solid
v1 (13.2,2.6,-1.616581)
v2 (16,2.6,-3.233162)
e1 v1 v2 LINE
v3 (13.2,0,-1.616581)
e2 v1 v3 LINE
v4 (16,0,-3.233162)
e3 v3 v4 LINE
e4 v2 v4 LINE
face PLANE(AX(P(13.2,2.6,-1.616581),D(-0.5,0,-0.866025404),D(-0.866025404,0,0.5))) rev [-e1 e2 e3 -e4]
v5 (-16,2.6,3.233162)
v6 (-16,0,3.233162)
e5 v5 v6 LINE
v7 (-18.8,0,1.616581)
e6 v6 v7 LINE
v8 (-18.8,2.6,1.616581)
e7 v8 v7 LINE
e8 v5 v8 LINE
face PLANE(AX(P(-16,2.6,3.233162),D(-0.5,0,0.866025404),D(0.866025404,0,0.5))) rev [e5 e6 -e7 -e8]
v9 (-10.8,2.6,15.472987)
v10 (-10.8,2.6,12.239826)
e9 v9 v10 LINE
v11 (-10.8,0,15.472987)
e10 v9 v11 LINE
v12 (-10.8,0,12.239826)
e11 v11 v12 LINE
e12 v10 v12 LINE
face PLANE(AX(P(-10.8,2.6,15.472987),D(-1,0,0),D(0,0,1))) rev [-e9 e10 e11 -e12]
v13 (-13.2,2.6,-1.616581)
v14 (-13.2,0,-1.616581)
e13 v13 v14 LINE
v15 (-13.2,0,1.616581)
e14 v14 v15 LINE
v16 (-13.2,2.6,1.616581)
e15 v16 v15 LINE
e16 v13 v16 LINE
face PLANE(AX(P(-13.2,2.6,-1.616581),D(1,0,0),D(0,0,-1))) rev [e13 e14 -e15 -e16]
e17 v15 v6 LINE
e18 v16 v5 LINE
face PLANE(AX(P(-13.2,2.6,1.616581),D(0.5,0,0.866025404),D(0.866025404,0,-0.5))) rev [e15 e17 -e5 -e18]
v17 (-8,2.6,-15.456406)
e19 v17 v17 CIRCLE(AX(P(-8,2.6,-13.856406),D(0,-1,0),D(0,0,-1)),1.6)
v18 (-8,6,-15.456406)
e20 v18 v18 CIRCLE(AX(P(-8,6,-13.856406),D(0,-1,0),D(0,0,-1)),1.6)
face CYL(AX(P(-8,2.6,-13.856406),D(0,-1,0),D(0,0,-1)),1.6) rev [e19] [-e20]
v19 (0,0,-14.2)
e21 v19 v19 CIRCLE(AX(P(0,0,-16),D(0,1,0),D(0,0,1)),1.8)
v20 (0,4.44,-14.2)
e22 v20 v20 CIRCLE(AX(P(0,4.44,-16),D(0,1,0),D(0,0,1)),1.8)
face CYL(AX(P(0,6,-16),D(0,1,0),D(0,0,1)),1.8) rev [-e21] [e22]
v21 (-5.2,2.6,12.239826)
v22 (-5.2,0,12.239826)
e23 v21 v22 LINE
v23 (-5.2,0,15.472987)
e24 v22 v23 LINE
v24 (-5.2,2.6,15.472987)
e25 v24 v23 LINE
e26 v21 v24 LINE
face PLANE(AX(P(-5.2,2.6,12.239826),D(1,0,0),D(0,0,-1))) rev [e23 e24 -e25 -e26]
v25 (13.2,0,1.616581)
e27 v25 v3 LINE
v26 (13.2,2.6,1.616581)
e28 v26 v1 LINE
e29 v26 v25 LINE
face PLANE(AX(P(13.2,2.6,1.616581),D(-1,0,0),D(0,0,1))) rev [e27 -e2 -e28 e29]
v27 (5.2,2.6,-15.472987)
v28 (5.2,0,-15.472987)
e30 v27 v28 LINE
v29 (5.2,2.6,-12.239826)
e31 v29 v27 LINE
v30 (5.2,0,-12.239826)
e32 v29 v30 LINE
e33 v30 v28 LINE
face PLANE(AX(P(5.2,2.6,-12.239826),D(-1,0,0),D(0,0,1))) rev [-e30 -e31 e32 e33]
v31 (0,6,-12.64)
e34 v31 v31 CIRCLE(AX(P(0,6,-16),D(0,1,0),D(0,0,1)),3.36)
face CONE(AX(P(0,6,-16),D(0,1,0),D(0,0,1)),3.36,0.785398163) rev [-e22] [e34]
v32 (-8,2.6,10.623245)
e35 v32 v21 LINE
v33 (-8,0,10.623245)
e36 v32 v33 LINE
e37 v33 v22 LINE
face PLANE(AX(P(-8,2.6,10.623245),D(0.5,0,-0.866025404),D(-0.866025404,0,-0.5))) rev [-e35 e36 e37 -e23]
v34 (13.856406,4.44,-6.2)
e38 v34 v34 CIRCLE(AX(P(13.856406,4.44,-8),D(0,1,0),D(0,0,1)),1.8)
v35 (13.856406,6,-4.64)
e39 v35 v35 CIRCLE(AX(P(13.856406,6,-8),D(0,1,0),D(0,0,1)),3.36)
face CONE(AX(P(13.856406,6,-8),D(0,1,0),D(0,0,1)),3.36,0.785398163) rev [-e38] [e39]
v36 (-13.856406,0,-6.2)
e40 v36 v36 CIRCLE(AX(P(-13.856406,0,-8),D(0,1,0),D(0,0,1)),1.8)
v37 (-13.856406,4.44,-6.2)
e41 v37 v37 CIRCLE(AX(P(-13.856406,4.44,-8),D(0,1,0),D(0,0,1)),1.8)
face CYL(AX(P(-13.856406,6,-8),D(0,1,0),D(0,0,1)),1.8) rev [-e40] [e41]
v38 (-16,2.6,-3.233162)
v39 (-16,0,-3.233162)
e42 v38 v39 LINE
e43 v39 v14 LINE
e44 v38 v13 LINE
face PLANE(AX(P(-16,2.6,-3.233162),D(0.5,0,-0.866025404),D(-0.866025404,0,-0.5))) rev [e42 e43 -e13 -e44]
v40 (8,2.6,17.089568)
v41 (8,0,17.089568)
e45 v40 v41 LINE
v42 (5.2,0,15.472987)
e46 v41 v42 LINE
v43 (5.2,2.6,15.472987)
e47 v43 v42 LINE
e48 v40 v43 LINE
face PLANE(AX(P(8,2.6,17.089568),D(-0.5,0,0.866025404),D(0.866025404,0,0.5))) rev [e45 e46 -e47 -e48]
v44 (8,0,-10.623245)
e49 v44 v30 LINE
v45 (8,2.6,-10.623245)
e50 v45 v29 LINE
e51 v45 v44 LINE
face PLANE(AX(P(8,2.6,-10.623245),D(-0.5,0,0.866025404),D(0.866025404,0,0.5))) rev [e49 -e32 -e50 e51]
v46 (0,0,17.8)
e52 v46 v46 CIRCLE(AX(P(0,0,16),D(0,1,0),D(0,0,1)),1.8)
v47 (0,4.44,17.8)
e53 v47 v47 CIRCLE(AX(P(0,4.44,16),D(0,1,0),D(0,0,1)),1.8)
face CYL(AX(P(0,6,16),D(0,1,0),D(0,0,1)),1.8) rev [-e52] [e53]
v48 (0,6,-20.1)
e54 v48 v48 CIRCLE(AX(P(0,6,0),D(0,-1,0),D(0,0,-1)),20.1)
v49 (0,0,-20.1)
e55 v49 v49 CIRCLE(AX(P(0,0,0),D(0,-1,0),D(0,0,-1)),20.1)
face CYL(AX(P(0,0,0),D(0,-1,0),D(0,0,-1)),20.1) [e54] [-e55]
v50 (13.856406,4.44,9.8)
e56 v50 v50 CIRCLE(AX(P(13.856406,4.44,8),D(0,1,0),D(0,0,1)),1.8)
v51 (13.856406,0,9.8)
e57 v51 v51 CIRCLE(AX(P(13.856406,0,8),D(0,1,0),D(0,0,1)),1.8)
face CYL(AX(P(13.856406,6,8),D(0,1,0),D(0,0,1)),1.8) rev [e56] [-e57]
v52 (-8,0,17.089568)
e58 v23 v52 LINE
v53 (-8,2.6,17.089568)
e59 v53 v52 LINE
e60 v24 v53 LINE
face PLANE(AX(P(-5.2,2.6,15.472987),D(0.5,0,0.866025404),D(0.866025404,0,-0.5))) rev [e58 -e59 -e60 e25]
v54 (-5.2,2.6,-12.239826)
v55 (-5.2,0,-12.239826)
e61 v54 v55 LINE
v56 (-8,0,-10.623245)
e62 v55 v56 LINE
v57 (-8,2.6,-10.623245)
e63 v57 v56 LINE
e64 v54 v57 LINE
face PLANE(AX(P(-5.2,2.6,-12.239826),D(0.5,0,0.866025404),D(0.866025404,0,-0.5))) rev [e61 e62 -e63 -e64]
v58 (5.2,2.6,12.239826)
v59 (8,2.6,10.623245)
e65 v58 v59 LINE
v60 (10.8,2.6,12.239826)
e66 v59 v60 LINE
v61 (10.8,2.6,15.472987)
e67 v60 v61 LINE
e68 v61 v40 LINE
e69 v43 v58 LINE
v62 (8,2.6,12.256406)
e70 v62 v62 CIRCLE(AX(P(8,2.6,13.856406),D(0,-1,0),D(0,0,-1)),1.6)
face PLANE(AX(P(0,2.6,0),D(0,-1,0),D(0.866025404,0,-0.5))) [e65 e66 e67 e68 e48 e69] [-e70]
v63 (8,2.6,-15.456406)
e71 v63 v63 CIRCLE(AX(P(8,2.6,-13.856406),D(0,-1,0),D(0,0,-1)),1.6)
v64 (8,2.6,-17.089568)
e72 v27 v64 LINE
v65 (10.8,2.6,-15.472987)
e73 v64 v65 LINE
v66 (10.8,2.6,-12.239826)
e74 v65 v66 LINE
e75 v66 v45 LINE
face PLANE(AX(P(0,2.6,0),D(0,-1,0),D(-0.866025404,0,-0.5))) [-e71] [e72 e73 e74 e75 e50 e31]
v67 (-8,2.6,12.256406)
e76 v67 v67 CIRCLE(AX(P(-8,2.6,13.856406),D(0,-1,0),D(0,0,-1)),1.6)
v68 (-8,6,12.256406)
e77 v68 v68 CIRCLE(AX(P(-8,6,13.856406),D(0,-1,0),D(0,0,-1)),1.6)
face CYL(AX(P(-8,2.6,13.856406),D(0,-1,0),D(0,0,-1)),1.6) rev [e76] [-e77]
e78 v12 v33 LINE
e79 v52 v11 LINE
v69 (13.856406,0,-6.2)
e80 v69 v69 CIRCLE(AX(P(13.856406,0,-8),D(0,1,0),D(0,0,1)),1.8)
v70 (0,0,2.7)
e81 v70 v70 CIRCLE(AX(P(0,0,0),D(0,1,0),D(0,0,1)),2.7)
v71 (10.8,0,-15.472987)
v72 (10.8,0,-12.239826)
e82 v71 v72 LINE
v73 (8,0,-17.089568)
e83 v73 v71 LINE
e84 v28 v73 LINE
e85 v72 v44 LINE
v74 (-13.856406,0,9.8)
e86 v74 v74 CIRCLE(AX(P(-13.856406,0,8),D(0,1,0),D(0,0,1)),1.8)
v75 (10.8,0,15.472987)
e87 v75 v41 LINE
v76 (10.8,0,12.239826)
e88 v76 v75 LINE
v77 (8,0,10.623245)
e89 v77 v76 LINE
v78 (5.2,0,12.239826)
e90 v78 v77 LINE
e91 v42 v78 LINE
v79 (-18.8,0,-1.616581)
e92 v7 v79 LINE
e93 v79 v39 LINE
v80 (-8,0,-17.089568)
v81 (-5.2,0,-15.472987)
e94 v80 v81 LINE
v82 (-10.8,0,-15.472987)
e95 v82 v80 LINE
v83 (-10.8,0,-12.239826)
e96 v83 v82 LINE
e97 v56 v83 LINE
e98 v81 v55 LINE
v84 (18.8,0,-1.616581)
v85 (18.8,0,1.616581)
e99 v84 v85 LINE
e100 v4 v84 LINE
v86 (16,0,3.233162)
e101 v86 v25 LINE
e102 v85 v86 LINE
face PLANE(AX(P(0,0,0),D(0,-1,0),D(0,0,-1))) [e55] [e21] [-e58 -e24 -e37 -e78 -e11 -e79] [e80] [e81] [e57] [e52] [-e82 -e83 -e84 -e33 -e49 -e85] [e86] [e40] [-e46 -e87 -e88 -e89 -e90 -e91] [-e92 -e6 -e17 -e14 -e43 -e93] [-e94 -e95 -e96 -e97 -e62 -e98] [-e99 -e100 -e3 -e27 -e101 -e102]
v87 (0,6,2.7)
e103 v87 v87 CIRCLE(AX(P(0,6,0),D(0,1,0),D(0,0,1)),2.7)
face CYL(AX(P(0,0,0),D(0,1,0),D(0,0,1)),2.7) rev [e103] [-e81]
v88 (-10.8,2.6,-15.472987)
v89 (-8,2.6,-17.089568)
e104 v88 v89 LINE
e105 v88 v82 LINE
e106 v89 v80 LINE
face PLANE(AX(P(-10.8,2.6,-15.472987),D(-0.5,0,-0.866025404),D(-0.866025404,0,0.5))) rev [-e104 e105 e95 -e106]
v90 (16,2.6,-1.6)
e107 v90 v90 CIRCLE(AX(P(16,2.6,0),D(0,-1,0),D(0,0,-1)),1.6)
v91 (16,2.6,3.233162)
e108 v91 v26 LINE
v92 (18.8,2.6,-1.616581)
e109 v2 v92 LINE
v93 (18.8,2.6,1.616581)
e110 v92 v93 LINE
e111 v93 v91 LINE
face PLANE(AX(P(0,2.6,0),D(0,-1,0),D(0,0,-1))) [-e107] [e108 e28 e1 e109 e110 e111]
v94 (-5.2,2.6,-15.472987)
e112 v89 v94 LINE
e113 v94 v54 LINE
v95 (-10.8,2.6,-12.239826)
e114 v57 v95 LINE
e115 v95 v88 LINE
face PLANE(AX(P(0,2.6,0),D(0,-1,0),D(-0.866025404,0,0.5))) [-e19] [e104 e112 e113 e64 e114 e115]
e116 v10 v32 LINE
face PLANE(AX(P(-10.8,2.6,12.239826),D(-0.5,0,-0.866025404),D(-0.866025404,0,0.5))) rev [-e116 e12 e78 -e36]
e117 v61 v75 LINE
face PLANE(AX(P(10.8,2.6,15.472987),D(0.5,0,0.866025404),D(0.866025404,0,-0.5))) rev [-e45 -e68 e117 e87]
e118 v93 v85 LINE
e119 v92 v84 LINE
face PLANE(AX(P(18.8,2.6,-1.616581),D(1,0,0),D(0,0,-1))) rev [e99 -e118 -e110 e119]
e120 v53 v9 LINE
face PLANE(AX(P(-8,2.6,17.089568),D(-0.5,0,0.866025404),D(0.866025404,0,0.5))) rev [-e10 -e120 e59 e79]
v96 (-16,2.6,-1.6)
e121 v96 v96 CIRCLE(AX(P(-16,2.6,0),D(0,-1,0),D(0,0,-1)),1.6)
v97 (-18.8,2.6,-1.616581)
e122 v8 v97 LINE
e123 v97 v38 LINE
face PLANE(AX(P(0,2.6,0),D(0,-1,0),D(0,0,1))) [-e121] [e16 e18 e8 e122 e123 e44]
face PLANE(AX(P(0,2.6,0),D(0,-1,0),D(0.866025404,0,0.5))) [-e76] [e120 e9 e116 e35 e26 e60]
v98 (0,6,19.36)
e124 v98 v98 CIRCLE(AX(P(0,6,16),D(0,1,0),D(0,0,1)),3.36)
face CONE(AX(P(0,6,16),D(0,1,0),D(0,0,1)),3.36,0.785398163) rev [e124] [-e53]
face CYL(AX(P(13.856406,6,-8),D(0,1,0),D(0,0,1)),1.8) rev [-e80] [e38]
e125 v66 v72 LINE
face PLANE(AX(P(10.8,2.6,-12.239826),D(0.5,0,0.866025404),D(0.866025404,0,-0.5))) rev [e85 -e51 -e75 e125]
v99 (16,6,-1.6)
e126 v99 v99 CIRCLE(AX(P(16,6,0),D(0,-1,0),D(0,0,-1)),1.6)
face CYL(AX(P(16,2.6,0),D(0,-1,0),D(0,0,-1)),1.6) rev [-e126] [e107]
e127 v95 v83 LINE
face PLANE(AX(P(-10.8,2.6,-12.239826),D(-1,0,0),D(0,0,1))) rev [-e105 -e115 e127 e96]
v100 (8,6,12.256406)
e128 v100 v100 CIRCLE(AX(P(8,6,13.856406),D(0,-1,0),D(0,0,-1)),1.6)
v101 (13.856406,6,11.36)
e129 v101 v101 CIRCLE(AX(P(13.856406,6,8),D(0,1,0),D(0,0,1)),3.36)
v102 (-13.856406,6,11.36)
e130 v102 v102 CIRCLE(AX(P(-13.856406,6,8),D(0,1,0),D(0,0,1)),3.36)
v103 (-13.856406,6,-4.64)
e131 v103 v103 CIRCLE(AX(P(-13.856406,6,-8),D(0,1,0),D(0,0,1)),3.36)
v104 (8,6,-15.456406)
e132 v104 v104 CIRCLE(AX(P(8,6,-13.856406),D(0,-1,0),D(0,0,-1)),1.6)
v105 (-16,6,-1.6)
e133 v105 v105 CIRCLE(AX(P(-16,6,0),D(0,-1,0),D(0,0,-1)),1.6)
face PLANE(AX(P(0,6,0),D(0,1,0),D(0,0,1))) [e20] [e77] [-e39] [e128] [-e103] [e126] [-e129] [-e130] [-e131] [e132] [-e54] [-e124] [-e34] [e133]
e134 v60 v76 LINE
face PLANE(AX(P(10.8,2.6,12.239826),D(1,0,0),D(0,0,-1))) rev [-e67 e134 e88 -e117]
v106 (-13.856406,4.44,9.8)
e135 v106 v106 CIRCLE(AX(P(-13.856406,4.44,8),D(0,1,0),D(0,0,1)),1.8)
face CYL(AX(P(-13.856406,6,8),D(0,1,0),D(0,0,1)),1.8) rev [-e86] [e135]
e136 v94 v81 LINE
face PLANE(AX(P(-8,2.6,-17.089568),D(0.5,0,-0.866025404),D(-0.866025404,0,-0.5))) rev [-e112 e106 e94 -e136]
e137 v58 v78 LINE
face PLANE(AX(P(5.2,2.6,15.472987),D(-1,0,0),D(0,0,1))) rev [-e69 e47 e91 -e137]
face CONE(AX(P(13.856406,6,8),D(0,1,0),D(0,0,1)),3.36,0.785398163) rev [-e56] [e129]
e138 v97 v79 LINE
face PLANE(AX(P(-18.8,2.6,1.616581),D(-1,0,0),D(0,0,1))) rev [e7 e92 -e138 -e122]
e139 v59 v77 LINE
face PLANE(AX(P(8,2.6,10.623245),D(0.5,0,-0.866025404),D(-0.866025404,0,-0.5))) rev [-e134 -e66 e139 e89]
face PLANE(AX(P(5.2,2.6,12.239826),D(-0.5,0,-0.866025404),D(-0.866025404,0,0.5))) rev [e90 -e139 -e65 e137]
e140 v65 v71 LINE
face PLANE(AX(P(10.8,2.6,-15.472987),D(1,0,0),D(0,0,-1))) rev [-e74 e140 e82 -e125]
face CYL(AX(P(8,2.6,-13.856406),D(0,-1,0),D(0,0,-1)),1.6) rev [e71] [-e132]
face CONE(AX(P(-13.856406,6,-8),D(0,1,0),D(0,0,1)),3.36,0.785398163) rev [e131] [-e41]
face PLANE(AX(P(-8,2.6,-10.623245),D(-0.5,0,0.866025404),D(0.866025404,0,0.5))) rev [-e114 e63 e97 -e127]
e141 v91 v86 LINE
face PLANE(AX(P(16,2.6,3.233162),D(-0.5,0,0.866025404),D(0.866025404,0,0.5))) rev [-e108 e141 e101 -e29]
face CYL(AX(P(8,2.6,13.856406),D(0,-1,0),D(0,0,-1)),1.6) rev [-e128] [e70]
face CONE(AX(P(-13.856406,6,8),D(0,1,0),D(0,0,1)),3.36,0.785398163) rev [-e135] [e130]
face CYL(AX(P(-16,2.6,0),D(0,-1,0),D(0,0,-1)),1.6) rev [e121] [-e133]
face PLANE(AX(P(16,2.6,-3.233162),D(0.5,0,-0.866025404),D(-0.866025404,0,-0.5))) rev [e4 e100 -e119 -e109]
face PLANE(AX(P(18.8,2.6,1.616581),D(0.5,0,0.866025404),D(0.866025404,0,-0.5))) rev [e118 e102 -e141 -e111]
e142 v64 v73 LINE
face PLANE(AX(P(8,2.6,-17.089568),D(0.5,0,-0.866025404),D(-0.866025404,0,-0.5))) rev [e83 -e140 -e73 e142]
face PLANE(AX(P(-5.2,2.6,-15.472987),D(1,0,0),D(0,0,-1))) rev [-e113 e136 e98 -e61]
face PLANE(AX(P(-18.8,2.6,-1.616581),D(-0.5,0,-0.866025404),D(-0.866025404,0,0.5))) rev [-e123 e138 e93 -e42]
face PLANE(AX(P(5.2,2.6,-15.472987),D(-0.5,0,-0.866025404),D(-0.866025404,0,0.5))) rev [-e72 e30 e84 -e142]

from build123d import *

# Parameters (mm, degrees)
SKETCH1_W            = 20.1
SKETCH1_H            = 6
SKETCH6_R            = 2.7
CUT_EXTRUDE2_DEPTH   = 30.052022305
CUT_EXTRUDE3_DEPTH   = 2.6
M3_CLEARANCE_HOLE2_D = 3.2
CIRPATTERN1_COUNT    = 6


# Read off the part's stored shape, not the designer's step: CSK for M3 Hex Socket Countersunk Cap Screw1
with BuildPart() as part:
    # Sketch1 → Revolve1 (revolve)
    with BuildSketch(Plane.XY, mode=Mode.PRIVATE) as revolve1_sk:
        with Locations((10.05, 3)):
            Rectangle(SKETCH1_W, SKETCH1_H)
    revolve(revolve1_sk.sketch.rotate(Axis((0, 0, 0), (0, 1, 0)), 90), axis=Axis((0, 0, 0), (0, 1, 0)))

    # Sketch6 → Cut-Extrude2 (cut, through all)
    with BuildSketch(Plane(origin=(0, 6, 0), x_dir=(1, 0, 0), z_dir=(0, 1, 0))):
        with Locations(Location((0, 0, 0), (0, 0, 270))):
            Circle(SKETCH6_R)
    extrude(amount=-CUT_EXTRUDE2_DEPTH, mode=Mode.SUBTRACT)

    # Sketch9 → Cut-Extrude3 (cut)
    with BuildSketch(Plane.XZ):
        Polygon((16, 3.233161507), (13.2, 1.616580754), (13.2, -1.616580754), (16, -3.233161507), (18.8, -1.616580754), (18.8, 1.616580754), align=None)
    cut_extrude3 = extrude(amount=-CUT_EXTRUDE3_DEPTH, mode=Mode.SUBTRACT)

    # M3 Clearance Hole2 (through all)
    with Locations(Plane(origin=(0, 2.6, 0), x_dir=(-1, 0, 0), z_dir=(0, -1, 0))):
        with Locations((-16, 0)):
            m3_clearance_hole2 = Hole(M3_CLEARANCE_HOLE2_D / 2)

    # CirPattern1: Cut-Extrude3, M3 Clearance Hole2 ×6 about axis
    cirpattern1_axis = Axis((0, 0, 0), (0, 1, 0))
    add([cut_extrude3.rotate(cirpattern1_axis, i * 360 / CIRPATTERN1_COUNT) for i in range(1, CIRPATTERN1_COUNT)], mode=Mode.SUBTRACT)
    add([m3_clearance_hole2.rotate(cirpattern1_axis, i * 360 / CIRPATTERN1_COUNT) for i in range(1, CIRPATTERN1_COUNT)], mode=Mode.SUBTRACT)

    # CSK for M3 Hex Socket Countersunk Ca 2 → CSK for M3 Hex Socket Countersunk Cap Screw1 (revolve, cut)
    with BuildSketch(Plane(origin=(-13.856406461, 0, 8), x_dir=(1, 0, 0), z_dir=(0, 0, 1))):
        Polygon((0, 0), (1.8, 0), (1.8, 4.44), (3.36, 6), (0, 6), align=None)
    revolve(axis=Axis((-13.856406461, 0, 8), (0, 1, 0)), mode=Mode.SUBTRACT)

    # CSK for M3 Hex Socket Countersunk Ca 3 o → CSK for M3 Hex Socket Countersunk Ca 3 (revolve, cut)
    with BuildSketch(Plane(origin=(-13.856406461, 0, -8), x_dir=(1, 0, 0), z_dir=(0, 0, 1))):
        Polygon((0, 0), (1.8, 0), (1.8, 4.44), (3.36, 6), (0, 6), align=None)
    revolve(axis=Axis((-13.856406461, 0, -8), (0, 1, 0)), mode=Mode.SUBTRACT)

    # CSK for M3 Hex Socket Countersunk Ca 4 o → CSK for M3 Hex Socket Countersunk Ca 4 (revolve, cut)
    with BuildSketch(Plane.XY.offset(-16)):
        Polygon((0, 0), (1.8, 0), (1.8, 4.44), (3.36, 6), (0, 6), align=None)
    revolve(axis=Axis((0, 0, -16), (0, 1, 0)), mode=Mode.SUBTRACT)

    # CSK for M3 Hex Socket Countersunk Ca 5 o → CSK for M3 Hex Socket Countersunk Ca 5 (revolve, cut)
    with BuildSketch(Plane(origin=(13.856406461, 0, -8), x_dir=(1, 0, 0), z_dir=(0, 0, 1))):
        Polygon((0, 0), (1.8, 0), (1.8, 4.44), (3.36, 6), (0, 6), align=None)
    revolve(axis=Axis((13.856406461, 0, -8), (0, 1, 0)), mode=Mode.SUBTRACT)

    # CSK for M3 Hex Socket Countersunk Ca 6 o → CSK for M3 Hex Socket Countersunk Ca 6 (revolve, cut)
    with BuildSketch(Plane(origin=(13.856406461, 0, 8), x_dir=(1, 0, 0), z_dir=(0, 0, 1))):
        Polygon((0, 0), (1.8, 0), (1.8, 4.44), (3.36, 6), (0, 6), align=None)
    revolve(axis=Axis((13.856406461, 0, 8), (0, 1, 0)), mode=Mode.SUBTRACT)

    # CSK for M3 Hex Socket Countersunk Ca 7 o → CSK for M3 Hex Socket Countersunk Ca 7 (revolve, cut)
    with BuildSketch(Plane.XY.offset(16)):
        Polygon((0, 0), (1.8, 0), (1.8, 4.44), (3.36, 6), (0, 6), align=None)
    revolve(axis=Axis((0, 0, 16), (0, 1, 0)), mode=Mode.SUBTRACT)


solid = part.part
